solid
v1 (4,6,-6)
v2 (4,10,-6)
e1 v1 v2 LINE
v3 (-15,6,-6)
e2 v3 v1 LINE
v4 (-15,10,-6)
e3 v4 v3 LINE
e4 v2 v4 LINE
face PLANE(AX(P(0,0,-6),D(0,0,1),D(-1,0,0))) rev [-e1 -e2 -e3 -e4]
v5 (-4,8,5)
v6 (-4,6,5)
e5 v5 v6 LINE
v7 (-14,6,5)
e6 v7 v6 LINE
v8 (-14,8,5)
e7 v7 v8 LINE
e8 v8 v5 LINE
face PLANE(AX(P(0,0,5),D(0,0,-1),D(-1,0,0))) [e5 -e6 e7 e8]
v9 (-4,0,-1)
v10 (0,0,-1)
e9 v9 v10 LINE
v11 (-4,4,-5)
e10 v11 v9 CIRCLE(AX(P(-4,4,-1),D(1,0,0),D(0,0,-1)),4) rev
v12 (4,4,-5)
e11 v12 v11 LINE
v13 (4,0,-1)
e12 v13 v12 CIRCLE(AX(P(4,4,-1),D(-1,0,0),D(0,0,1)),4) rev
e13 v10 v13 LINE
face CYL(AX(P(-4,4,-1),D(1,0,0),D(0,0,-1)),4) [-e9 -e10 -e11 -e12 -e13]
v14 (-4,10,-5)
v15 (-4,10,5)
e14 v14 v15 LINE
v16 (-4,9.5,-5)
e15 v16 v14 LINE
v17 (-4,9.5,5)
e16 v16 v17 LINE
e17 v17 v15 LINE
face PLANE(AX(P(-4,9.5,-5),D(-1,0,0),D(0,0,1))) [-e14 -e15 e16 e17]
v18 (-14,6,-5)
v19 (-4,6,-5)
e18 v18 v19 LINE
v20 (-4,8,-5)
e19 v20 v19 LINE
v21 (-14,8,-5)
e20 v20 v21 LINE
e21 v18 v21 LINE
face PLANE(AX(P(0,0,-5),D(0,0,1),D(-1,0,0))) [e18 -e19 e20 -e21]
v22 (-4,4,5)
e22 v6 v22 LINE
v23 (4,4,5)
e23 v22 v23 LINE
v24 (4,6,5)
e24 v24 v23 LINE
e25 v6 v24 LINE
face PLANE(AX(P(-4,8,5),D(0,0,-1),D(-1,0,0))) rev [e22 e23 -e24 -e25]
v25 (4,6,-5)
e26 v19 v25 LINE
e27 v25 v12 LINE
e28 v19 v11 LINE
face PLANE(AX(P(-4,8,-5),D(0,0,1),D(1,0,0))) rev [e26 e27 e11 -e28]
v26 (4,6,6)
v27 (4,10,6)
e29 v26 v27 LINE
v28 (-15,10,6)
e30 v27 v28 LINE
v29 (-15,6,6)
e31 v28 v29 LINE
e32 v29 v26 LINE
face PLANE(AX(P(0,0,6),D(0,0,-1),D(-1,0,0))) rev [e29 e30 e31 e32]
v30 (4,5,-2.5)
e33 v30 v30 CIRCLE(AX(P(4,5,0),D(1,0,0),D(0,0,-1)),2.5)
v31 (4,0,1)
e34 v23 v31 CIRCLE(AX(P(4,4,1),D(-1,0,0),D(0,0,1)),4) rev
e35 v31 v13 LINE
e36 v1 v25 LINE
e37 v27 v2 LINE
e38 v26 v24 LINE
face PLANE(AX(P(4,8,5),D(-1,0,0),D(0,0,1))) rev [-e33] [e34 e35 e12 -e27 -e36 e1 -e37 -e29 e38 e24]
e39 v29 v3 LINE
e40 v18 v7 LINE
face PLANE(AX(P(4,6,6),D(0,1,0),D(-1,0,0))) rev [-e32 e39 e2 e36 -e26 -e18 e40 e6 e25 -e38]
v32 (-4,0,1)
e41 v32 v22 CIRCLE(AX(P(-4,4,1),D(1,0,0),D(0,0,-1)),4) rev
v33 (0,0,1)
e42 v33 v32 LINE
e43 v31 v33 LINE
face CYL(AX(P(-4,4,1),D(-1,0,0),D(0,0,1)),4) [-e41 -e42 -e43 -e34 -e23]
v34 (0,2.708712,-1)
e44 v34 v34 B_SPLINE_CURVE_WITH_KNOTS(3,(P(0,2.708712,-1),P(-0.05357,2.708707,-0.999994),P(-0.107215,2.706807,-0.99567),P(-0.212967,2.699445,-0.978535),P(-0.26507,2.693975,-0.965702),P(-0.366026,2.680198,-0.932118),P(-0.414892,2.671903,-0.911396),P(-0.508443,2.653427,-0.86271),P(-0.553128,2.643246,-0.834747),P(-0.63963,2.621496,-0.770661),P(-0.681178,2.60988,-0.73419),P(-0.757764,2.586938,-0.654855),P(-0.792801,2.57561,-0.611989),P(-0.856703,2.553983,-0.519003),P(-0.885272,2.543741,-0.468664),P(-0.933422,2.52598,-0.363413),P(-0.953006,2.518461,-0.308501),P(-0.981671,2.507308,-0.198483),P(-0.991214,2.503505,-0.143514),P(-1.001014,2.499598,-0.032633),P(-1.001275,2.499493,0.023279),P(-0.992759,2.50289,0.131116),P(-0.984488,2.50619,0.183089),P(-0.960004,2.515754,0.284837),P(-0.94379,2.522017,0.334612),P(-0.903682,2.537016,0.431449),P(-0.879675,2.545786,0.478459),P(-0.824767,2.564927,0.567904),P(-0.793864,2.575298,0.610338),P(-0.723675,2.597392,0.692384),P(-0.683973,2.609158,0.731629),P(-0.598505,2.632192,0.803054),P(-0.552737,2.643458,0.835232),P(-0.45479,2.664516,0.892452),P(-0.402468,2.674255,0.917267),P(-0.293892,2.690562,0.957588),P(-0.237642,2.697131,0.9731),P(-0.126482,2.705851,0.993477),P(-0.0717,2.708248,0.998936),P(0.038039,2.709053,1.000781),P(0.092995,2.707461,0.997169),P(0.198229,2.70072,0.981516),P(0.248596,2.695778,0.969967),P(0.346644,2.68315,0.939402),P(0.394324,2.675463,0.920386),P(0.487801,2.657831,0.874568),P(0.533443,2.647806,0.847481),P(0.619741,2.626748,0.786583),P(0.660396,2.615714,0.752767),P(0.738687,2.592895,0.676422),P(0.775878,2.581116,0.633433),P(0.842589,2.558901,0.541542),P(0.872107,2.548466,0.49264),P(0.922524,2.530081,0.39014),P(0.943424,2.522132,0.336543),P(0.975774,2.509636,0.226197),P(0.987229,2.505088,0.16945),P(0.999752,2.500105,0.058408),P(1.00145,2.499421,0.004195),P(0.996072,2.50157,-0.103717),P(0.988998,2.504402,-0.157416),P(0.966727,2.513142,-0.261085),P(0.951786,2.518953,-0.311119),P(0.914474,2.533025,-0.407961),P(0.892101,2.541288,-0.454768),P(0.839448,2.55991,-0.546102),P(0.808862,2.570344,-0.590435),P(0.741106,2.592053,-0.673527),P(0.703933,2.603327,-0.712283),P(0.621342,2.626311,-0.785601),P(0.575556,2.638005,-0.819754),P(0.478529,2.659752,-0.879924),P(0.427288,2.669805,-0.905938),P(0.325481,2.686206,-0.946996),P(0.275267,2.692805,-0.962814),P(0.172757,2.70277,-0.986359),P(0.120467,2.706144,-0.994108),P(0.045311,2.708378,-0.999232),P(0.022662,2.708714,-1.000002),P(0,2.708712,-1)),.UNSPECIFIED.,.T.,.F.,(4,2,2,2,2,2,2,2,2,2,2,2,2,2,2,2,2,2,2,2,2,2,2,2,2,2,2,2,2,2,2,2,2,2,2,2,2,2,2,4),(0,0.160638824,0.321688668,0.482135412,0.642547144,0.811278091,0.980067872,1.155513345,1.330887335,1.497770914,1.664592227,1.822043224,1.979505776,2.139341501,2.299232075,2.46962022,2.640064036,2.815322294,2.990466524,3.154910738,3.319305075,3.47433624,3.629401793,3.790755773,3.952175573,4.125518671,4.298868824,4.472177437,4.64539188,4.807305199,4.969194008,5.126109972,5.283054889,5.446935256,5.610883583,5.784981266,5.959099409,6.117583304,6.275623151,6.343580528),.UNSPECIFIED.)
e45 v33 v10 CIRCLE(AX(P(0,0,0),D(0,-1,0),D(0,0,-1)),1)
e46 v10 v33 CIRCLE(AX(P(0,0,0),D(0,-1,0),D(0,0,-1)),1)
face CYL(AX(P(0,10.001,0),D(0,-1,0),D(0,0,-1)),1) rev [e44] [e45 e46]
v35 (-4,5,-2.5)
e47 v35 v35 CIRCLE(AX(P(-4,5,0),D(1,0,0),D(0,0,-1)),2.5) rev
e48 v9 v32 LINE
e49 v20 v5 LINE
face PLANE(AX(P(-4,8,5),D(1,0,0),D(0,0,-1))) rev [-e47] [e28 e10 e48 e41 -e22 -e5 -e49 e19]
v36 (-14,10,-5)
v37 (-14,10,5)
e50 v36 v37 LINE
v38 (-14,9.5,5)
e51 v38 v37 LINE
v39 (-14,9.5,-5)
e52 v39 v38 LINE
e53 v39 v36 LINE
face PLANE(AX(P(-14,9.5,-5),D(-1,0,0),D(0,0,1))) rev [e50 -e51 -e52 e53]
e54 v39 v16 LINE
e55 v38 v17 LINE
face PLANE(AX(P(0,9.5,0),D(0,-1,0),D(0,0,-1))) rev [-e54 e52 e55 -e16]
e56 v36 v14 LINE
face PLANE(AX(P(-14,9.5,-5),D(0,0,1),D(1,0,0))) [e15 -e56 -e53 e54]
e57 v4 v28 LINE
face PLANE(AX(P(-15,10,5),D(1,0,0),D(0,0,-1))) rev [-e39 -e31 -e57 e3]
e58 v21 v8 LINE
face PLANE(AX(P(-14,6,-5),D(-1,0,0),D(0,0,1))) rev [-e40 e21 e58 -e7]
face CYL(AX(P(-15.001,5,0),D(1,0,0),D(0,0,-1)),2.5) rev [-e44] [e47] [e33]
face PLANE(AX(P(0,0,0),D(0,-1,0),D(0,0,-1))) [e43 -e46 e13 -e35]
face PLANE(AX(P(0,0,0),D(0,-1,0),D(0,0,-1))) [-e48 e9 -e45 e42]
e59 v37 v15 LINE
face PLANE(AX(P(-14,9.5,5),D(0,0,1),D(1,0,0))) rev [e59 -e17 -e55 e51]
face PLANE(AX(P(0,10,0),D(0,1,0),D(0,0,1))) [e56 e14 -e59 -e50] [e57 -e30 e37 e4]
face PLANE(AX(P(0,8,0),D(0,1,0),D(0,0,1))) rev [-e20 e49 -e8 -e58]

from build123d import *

# Parameters (mm, degrees)
SKETCH2_W               = 8
SKETCH2_H               = 10
BOSS_EXTRUDE1_DEPTH     = 8
SKETCH4_W               = 19
SKETCH4_H               = 10
BOSS_EXTRUDE2_DEPTH     = 2
SKETCH6_W               = 19
SKETCH6_H               = 4
BOSS_EXTRUDE3_DEPTH     = 1
SKETCH7_W               = 1
SKETCH7_H               = 10
BOSS_EXTRUDE4_DEPTH     = 2
CUT_EXTRUDE1_REACH      = 24.293
SKETCH3_R               = 2.5
CUT_EXTRUDE2_REACH      = 21
CUT_EXTRUDE2_END_RADIUS = 2.5
SKETCH8_R               = 1
FILLET3_R               = 4
SKETCH9_W               = 10
SKETCH9_H               = 10
CUT_EXTRUDE3_DEPTH      = 0.5


with BuildPart() as part:
    # Sketch2 → Boss-Extrude1 (new body)
    with BuildSketch(Plane(origin=(0, 0, 0), x_dir=(1, 0, 0), z_dir=(0, 1, 0))):
        Rectangle(SKETCH2_W, SKETCH2_H)
    extrude(amount=BOSS_EXTRUDE1_DEPTH)

    # Sketch4 → Boss-Extrude2 (add)
    with BuildSketch(Plane(origin=(0, 8, 0), x_dir=(1, 0, 0), z_dir=(0, 1, 0))):
        with Locations((-5.5, 0)):
            Rectangle(SKETCH4_W, SKETCH4_H)
    extrude(amount=BOSS_EXTRUDE2_DEPTH)

    # Sketch6 → Boss-Extrude3 (add)
    with BuildSketch(Plane.XY.offset(5)):
        with Locations((-5.5, 8)):
            Rectangle(SKETCH6_W, SKETCH6_H)
    boss_extrude3 = extrude(amount=BOSS_EXTRUDE3_DEPTH)

    # Mirror1: Boss-Extrude3 across plane
    add(boss_extrude3.mirror(Plane.XY))

    # Sketch7 → Boss-Extrude4 (add)
    with BuildSketch(Plane.XZ.offset(-8)):
        with Locations((-14.5, 0)):
            Rectangle(SKETCH7_W, SKETCH7_H)
    extrude(amount=BOSS_EXTRUDE4_DEPTH)

    # Sketch3 → Cut-Extrude1 (cut, up to next)
    with BuildSketch(Plane(origin=(4, 0, 0), x_dir=(0, 0, -1), z_dir=(1, 0, 0)), mode=Mode.PRIVATE) as cut_extrude1_sk1:
        with Locations((0, 5)):
            Circle(SKETCH3_R)
    cut_extrude1_tool1 = extrude(cut_extrude1_sk1.sketch, amount=-CUT_EXTRUDE1_REACH, mode=Mode.PRIVATE) & part.part
    add(cut_extrude1_tool1.solids().sort_by_distance((4, 5, 0))[0], mode=Mode.SUBTRACT)

    # Cut-Extrude2: up to this cylinder (the profile starts outside it)
    cut_extrude2_end = Plane(origin=(0, 5, 0), z_dir=(1, 0, 0)) * Cylinder(CUT_EXTRUDE2_END_RADIUS, 48, mode=Mode.PRIVATE)
    # Sketch8 → Cut-Extrude2 (cut, up to the surface)
    with BuildSketch(Plane.XZ, mode=Mode.PRIVATE) as cut_extrude2_sk1:
        with Locations(Location((0, 0, 0), (0, 0, 270))):
            Circle(SKETCH8_R)
    cut_extrude2_tool1 = extrude(cut_extrude2_sk1.sketch, amount=-CUT_EXTRUDE2_REACH, mode=Mode.PRIVATE) - cut_extrude2_end
    add(cut_extrude2_tool1.solids().sort_by_distance((0, 0, 0))[0], mode=Mode.SUBTRACT)

    # Fillet3
    fillet3_edges = [part.edges().sort_by_distance(p)[0] for p in [
        (0, 0, 5),
        (0, 0, -5),
    ]]
    fillet(fillet3_edges, radius=FILLET3_R - 0.0001)  # a hair under: the kernel refuses the full size

    # Sketch9 → Cut-Extrude3 (cut)
    with BuildSketch(Plane(origin=(0, 10, 0), x_dir=(1, 0, 0), z_dir=(0, 1, 0))):
        with Locations((-9, 0)):
            Rectangle(SKETCH9_W, SKETCH9_H)
    extrude(amount=-CUT_EXTRUDE3_DEPTH, mode=Mode.SUBTRACT)


solid = part.part
